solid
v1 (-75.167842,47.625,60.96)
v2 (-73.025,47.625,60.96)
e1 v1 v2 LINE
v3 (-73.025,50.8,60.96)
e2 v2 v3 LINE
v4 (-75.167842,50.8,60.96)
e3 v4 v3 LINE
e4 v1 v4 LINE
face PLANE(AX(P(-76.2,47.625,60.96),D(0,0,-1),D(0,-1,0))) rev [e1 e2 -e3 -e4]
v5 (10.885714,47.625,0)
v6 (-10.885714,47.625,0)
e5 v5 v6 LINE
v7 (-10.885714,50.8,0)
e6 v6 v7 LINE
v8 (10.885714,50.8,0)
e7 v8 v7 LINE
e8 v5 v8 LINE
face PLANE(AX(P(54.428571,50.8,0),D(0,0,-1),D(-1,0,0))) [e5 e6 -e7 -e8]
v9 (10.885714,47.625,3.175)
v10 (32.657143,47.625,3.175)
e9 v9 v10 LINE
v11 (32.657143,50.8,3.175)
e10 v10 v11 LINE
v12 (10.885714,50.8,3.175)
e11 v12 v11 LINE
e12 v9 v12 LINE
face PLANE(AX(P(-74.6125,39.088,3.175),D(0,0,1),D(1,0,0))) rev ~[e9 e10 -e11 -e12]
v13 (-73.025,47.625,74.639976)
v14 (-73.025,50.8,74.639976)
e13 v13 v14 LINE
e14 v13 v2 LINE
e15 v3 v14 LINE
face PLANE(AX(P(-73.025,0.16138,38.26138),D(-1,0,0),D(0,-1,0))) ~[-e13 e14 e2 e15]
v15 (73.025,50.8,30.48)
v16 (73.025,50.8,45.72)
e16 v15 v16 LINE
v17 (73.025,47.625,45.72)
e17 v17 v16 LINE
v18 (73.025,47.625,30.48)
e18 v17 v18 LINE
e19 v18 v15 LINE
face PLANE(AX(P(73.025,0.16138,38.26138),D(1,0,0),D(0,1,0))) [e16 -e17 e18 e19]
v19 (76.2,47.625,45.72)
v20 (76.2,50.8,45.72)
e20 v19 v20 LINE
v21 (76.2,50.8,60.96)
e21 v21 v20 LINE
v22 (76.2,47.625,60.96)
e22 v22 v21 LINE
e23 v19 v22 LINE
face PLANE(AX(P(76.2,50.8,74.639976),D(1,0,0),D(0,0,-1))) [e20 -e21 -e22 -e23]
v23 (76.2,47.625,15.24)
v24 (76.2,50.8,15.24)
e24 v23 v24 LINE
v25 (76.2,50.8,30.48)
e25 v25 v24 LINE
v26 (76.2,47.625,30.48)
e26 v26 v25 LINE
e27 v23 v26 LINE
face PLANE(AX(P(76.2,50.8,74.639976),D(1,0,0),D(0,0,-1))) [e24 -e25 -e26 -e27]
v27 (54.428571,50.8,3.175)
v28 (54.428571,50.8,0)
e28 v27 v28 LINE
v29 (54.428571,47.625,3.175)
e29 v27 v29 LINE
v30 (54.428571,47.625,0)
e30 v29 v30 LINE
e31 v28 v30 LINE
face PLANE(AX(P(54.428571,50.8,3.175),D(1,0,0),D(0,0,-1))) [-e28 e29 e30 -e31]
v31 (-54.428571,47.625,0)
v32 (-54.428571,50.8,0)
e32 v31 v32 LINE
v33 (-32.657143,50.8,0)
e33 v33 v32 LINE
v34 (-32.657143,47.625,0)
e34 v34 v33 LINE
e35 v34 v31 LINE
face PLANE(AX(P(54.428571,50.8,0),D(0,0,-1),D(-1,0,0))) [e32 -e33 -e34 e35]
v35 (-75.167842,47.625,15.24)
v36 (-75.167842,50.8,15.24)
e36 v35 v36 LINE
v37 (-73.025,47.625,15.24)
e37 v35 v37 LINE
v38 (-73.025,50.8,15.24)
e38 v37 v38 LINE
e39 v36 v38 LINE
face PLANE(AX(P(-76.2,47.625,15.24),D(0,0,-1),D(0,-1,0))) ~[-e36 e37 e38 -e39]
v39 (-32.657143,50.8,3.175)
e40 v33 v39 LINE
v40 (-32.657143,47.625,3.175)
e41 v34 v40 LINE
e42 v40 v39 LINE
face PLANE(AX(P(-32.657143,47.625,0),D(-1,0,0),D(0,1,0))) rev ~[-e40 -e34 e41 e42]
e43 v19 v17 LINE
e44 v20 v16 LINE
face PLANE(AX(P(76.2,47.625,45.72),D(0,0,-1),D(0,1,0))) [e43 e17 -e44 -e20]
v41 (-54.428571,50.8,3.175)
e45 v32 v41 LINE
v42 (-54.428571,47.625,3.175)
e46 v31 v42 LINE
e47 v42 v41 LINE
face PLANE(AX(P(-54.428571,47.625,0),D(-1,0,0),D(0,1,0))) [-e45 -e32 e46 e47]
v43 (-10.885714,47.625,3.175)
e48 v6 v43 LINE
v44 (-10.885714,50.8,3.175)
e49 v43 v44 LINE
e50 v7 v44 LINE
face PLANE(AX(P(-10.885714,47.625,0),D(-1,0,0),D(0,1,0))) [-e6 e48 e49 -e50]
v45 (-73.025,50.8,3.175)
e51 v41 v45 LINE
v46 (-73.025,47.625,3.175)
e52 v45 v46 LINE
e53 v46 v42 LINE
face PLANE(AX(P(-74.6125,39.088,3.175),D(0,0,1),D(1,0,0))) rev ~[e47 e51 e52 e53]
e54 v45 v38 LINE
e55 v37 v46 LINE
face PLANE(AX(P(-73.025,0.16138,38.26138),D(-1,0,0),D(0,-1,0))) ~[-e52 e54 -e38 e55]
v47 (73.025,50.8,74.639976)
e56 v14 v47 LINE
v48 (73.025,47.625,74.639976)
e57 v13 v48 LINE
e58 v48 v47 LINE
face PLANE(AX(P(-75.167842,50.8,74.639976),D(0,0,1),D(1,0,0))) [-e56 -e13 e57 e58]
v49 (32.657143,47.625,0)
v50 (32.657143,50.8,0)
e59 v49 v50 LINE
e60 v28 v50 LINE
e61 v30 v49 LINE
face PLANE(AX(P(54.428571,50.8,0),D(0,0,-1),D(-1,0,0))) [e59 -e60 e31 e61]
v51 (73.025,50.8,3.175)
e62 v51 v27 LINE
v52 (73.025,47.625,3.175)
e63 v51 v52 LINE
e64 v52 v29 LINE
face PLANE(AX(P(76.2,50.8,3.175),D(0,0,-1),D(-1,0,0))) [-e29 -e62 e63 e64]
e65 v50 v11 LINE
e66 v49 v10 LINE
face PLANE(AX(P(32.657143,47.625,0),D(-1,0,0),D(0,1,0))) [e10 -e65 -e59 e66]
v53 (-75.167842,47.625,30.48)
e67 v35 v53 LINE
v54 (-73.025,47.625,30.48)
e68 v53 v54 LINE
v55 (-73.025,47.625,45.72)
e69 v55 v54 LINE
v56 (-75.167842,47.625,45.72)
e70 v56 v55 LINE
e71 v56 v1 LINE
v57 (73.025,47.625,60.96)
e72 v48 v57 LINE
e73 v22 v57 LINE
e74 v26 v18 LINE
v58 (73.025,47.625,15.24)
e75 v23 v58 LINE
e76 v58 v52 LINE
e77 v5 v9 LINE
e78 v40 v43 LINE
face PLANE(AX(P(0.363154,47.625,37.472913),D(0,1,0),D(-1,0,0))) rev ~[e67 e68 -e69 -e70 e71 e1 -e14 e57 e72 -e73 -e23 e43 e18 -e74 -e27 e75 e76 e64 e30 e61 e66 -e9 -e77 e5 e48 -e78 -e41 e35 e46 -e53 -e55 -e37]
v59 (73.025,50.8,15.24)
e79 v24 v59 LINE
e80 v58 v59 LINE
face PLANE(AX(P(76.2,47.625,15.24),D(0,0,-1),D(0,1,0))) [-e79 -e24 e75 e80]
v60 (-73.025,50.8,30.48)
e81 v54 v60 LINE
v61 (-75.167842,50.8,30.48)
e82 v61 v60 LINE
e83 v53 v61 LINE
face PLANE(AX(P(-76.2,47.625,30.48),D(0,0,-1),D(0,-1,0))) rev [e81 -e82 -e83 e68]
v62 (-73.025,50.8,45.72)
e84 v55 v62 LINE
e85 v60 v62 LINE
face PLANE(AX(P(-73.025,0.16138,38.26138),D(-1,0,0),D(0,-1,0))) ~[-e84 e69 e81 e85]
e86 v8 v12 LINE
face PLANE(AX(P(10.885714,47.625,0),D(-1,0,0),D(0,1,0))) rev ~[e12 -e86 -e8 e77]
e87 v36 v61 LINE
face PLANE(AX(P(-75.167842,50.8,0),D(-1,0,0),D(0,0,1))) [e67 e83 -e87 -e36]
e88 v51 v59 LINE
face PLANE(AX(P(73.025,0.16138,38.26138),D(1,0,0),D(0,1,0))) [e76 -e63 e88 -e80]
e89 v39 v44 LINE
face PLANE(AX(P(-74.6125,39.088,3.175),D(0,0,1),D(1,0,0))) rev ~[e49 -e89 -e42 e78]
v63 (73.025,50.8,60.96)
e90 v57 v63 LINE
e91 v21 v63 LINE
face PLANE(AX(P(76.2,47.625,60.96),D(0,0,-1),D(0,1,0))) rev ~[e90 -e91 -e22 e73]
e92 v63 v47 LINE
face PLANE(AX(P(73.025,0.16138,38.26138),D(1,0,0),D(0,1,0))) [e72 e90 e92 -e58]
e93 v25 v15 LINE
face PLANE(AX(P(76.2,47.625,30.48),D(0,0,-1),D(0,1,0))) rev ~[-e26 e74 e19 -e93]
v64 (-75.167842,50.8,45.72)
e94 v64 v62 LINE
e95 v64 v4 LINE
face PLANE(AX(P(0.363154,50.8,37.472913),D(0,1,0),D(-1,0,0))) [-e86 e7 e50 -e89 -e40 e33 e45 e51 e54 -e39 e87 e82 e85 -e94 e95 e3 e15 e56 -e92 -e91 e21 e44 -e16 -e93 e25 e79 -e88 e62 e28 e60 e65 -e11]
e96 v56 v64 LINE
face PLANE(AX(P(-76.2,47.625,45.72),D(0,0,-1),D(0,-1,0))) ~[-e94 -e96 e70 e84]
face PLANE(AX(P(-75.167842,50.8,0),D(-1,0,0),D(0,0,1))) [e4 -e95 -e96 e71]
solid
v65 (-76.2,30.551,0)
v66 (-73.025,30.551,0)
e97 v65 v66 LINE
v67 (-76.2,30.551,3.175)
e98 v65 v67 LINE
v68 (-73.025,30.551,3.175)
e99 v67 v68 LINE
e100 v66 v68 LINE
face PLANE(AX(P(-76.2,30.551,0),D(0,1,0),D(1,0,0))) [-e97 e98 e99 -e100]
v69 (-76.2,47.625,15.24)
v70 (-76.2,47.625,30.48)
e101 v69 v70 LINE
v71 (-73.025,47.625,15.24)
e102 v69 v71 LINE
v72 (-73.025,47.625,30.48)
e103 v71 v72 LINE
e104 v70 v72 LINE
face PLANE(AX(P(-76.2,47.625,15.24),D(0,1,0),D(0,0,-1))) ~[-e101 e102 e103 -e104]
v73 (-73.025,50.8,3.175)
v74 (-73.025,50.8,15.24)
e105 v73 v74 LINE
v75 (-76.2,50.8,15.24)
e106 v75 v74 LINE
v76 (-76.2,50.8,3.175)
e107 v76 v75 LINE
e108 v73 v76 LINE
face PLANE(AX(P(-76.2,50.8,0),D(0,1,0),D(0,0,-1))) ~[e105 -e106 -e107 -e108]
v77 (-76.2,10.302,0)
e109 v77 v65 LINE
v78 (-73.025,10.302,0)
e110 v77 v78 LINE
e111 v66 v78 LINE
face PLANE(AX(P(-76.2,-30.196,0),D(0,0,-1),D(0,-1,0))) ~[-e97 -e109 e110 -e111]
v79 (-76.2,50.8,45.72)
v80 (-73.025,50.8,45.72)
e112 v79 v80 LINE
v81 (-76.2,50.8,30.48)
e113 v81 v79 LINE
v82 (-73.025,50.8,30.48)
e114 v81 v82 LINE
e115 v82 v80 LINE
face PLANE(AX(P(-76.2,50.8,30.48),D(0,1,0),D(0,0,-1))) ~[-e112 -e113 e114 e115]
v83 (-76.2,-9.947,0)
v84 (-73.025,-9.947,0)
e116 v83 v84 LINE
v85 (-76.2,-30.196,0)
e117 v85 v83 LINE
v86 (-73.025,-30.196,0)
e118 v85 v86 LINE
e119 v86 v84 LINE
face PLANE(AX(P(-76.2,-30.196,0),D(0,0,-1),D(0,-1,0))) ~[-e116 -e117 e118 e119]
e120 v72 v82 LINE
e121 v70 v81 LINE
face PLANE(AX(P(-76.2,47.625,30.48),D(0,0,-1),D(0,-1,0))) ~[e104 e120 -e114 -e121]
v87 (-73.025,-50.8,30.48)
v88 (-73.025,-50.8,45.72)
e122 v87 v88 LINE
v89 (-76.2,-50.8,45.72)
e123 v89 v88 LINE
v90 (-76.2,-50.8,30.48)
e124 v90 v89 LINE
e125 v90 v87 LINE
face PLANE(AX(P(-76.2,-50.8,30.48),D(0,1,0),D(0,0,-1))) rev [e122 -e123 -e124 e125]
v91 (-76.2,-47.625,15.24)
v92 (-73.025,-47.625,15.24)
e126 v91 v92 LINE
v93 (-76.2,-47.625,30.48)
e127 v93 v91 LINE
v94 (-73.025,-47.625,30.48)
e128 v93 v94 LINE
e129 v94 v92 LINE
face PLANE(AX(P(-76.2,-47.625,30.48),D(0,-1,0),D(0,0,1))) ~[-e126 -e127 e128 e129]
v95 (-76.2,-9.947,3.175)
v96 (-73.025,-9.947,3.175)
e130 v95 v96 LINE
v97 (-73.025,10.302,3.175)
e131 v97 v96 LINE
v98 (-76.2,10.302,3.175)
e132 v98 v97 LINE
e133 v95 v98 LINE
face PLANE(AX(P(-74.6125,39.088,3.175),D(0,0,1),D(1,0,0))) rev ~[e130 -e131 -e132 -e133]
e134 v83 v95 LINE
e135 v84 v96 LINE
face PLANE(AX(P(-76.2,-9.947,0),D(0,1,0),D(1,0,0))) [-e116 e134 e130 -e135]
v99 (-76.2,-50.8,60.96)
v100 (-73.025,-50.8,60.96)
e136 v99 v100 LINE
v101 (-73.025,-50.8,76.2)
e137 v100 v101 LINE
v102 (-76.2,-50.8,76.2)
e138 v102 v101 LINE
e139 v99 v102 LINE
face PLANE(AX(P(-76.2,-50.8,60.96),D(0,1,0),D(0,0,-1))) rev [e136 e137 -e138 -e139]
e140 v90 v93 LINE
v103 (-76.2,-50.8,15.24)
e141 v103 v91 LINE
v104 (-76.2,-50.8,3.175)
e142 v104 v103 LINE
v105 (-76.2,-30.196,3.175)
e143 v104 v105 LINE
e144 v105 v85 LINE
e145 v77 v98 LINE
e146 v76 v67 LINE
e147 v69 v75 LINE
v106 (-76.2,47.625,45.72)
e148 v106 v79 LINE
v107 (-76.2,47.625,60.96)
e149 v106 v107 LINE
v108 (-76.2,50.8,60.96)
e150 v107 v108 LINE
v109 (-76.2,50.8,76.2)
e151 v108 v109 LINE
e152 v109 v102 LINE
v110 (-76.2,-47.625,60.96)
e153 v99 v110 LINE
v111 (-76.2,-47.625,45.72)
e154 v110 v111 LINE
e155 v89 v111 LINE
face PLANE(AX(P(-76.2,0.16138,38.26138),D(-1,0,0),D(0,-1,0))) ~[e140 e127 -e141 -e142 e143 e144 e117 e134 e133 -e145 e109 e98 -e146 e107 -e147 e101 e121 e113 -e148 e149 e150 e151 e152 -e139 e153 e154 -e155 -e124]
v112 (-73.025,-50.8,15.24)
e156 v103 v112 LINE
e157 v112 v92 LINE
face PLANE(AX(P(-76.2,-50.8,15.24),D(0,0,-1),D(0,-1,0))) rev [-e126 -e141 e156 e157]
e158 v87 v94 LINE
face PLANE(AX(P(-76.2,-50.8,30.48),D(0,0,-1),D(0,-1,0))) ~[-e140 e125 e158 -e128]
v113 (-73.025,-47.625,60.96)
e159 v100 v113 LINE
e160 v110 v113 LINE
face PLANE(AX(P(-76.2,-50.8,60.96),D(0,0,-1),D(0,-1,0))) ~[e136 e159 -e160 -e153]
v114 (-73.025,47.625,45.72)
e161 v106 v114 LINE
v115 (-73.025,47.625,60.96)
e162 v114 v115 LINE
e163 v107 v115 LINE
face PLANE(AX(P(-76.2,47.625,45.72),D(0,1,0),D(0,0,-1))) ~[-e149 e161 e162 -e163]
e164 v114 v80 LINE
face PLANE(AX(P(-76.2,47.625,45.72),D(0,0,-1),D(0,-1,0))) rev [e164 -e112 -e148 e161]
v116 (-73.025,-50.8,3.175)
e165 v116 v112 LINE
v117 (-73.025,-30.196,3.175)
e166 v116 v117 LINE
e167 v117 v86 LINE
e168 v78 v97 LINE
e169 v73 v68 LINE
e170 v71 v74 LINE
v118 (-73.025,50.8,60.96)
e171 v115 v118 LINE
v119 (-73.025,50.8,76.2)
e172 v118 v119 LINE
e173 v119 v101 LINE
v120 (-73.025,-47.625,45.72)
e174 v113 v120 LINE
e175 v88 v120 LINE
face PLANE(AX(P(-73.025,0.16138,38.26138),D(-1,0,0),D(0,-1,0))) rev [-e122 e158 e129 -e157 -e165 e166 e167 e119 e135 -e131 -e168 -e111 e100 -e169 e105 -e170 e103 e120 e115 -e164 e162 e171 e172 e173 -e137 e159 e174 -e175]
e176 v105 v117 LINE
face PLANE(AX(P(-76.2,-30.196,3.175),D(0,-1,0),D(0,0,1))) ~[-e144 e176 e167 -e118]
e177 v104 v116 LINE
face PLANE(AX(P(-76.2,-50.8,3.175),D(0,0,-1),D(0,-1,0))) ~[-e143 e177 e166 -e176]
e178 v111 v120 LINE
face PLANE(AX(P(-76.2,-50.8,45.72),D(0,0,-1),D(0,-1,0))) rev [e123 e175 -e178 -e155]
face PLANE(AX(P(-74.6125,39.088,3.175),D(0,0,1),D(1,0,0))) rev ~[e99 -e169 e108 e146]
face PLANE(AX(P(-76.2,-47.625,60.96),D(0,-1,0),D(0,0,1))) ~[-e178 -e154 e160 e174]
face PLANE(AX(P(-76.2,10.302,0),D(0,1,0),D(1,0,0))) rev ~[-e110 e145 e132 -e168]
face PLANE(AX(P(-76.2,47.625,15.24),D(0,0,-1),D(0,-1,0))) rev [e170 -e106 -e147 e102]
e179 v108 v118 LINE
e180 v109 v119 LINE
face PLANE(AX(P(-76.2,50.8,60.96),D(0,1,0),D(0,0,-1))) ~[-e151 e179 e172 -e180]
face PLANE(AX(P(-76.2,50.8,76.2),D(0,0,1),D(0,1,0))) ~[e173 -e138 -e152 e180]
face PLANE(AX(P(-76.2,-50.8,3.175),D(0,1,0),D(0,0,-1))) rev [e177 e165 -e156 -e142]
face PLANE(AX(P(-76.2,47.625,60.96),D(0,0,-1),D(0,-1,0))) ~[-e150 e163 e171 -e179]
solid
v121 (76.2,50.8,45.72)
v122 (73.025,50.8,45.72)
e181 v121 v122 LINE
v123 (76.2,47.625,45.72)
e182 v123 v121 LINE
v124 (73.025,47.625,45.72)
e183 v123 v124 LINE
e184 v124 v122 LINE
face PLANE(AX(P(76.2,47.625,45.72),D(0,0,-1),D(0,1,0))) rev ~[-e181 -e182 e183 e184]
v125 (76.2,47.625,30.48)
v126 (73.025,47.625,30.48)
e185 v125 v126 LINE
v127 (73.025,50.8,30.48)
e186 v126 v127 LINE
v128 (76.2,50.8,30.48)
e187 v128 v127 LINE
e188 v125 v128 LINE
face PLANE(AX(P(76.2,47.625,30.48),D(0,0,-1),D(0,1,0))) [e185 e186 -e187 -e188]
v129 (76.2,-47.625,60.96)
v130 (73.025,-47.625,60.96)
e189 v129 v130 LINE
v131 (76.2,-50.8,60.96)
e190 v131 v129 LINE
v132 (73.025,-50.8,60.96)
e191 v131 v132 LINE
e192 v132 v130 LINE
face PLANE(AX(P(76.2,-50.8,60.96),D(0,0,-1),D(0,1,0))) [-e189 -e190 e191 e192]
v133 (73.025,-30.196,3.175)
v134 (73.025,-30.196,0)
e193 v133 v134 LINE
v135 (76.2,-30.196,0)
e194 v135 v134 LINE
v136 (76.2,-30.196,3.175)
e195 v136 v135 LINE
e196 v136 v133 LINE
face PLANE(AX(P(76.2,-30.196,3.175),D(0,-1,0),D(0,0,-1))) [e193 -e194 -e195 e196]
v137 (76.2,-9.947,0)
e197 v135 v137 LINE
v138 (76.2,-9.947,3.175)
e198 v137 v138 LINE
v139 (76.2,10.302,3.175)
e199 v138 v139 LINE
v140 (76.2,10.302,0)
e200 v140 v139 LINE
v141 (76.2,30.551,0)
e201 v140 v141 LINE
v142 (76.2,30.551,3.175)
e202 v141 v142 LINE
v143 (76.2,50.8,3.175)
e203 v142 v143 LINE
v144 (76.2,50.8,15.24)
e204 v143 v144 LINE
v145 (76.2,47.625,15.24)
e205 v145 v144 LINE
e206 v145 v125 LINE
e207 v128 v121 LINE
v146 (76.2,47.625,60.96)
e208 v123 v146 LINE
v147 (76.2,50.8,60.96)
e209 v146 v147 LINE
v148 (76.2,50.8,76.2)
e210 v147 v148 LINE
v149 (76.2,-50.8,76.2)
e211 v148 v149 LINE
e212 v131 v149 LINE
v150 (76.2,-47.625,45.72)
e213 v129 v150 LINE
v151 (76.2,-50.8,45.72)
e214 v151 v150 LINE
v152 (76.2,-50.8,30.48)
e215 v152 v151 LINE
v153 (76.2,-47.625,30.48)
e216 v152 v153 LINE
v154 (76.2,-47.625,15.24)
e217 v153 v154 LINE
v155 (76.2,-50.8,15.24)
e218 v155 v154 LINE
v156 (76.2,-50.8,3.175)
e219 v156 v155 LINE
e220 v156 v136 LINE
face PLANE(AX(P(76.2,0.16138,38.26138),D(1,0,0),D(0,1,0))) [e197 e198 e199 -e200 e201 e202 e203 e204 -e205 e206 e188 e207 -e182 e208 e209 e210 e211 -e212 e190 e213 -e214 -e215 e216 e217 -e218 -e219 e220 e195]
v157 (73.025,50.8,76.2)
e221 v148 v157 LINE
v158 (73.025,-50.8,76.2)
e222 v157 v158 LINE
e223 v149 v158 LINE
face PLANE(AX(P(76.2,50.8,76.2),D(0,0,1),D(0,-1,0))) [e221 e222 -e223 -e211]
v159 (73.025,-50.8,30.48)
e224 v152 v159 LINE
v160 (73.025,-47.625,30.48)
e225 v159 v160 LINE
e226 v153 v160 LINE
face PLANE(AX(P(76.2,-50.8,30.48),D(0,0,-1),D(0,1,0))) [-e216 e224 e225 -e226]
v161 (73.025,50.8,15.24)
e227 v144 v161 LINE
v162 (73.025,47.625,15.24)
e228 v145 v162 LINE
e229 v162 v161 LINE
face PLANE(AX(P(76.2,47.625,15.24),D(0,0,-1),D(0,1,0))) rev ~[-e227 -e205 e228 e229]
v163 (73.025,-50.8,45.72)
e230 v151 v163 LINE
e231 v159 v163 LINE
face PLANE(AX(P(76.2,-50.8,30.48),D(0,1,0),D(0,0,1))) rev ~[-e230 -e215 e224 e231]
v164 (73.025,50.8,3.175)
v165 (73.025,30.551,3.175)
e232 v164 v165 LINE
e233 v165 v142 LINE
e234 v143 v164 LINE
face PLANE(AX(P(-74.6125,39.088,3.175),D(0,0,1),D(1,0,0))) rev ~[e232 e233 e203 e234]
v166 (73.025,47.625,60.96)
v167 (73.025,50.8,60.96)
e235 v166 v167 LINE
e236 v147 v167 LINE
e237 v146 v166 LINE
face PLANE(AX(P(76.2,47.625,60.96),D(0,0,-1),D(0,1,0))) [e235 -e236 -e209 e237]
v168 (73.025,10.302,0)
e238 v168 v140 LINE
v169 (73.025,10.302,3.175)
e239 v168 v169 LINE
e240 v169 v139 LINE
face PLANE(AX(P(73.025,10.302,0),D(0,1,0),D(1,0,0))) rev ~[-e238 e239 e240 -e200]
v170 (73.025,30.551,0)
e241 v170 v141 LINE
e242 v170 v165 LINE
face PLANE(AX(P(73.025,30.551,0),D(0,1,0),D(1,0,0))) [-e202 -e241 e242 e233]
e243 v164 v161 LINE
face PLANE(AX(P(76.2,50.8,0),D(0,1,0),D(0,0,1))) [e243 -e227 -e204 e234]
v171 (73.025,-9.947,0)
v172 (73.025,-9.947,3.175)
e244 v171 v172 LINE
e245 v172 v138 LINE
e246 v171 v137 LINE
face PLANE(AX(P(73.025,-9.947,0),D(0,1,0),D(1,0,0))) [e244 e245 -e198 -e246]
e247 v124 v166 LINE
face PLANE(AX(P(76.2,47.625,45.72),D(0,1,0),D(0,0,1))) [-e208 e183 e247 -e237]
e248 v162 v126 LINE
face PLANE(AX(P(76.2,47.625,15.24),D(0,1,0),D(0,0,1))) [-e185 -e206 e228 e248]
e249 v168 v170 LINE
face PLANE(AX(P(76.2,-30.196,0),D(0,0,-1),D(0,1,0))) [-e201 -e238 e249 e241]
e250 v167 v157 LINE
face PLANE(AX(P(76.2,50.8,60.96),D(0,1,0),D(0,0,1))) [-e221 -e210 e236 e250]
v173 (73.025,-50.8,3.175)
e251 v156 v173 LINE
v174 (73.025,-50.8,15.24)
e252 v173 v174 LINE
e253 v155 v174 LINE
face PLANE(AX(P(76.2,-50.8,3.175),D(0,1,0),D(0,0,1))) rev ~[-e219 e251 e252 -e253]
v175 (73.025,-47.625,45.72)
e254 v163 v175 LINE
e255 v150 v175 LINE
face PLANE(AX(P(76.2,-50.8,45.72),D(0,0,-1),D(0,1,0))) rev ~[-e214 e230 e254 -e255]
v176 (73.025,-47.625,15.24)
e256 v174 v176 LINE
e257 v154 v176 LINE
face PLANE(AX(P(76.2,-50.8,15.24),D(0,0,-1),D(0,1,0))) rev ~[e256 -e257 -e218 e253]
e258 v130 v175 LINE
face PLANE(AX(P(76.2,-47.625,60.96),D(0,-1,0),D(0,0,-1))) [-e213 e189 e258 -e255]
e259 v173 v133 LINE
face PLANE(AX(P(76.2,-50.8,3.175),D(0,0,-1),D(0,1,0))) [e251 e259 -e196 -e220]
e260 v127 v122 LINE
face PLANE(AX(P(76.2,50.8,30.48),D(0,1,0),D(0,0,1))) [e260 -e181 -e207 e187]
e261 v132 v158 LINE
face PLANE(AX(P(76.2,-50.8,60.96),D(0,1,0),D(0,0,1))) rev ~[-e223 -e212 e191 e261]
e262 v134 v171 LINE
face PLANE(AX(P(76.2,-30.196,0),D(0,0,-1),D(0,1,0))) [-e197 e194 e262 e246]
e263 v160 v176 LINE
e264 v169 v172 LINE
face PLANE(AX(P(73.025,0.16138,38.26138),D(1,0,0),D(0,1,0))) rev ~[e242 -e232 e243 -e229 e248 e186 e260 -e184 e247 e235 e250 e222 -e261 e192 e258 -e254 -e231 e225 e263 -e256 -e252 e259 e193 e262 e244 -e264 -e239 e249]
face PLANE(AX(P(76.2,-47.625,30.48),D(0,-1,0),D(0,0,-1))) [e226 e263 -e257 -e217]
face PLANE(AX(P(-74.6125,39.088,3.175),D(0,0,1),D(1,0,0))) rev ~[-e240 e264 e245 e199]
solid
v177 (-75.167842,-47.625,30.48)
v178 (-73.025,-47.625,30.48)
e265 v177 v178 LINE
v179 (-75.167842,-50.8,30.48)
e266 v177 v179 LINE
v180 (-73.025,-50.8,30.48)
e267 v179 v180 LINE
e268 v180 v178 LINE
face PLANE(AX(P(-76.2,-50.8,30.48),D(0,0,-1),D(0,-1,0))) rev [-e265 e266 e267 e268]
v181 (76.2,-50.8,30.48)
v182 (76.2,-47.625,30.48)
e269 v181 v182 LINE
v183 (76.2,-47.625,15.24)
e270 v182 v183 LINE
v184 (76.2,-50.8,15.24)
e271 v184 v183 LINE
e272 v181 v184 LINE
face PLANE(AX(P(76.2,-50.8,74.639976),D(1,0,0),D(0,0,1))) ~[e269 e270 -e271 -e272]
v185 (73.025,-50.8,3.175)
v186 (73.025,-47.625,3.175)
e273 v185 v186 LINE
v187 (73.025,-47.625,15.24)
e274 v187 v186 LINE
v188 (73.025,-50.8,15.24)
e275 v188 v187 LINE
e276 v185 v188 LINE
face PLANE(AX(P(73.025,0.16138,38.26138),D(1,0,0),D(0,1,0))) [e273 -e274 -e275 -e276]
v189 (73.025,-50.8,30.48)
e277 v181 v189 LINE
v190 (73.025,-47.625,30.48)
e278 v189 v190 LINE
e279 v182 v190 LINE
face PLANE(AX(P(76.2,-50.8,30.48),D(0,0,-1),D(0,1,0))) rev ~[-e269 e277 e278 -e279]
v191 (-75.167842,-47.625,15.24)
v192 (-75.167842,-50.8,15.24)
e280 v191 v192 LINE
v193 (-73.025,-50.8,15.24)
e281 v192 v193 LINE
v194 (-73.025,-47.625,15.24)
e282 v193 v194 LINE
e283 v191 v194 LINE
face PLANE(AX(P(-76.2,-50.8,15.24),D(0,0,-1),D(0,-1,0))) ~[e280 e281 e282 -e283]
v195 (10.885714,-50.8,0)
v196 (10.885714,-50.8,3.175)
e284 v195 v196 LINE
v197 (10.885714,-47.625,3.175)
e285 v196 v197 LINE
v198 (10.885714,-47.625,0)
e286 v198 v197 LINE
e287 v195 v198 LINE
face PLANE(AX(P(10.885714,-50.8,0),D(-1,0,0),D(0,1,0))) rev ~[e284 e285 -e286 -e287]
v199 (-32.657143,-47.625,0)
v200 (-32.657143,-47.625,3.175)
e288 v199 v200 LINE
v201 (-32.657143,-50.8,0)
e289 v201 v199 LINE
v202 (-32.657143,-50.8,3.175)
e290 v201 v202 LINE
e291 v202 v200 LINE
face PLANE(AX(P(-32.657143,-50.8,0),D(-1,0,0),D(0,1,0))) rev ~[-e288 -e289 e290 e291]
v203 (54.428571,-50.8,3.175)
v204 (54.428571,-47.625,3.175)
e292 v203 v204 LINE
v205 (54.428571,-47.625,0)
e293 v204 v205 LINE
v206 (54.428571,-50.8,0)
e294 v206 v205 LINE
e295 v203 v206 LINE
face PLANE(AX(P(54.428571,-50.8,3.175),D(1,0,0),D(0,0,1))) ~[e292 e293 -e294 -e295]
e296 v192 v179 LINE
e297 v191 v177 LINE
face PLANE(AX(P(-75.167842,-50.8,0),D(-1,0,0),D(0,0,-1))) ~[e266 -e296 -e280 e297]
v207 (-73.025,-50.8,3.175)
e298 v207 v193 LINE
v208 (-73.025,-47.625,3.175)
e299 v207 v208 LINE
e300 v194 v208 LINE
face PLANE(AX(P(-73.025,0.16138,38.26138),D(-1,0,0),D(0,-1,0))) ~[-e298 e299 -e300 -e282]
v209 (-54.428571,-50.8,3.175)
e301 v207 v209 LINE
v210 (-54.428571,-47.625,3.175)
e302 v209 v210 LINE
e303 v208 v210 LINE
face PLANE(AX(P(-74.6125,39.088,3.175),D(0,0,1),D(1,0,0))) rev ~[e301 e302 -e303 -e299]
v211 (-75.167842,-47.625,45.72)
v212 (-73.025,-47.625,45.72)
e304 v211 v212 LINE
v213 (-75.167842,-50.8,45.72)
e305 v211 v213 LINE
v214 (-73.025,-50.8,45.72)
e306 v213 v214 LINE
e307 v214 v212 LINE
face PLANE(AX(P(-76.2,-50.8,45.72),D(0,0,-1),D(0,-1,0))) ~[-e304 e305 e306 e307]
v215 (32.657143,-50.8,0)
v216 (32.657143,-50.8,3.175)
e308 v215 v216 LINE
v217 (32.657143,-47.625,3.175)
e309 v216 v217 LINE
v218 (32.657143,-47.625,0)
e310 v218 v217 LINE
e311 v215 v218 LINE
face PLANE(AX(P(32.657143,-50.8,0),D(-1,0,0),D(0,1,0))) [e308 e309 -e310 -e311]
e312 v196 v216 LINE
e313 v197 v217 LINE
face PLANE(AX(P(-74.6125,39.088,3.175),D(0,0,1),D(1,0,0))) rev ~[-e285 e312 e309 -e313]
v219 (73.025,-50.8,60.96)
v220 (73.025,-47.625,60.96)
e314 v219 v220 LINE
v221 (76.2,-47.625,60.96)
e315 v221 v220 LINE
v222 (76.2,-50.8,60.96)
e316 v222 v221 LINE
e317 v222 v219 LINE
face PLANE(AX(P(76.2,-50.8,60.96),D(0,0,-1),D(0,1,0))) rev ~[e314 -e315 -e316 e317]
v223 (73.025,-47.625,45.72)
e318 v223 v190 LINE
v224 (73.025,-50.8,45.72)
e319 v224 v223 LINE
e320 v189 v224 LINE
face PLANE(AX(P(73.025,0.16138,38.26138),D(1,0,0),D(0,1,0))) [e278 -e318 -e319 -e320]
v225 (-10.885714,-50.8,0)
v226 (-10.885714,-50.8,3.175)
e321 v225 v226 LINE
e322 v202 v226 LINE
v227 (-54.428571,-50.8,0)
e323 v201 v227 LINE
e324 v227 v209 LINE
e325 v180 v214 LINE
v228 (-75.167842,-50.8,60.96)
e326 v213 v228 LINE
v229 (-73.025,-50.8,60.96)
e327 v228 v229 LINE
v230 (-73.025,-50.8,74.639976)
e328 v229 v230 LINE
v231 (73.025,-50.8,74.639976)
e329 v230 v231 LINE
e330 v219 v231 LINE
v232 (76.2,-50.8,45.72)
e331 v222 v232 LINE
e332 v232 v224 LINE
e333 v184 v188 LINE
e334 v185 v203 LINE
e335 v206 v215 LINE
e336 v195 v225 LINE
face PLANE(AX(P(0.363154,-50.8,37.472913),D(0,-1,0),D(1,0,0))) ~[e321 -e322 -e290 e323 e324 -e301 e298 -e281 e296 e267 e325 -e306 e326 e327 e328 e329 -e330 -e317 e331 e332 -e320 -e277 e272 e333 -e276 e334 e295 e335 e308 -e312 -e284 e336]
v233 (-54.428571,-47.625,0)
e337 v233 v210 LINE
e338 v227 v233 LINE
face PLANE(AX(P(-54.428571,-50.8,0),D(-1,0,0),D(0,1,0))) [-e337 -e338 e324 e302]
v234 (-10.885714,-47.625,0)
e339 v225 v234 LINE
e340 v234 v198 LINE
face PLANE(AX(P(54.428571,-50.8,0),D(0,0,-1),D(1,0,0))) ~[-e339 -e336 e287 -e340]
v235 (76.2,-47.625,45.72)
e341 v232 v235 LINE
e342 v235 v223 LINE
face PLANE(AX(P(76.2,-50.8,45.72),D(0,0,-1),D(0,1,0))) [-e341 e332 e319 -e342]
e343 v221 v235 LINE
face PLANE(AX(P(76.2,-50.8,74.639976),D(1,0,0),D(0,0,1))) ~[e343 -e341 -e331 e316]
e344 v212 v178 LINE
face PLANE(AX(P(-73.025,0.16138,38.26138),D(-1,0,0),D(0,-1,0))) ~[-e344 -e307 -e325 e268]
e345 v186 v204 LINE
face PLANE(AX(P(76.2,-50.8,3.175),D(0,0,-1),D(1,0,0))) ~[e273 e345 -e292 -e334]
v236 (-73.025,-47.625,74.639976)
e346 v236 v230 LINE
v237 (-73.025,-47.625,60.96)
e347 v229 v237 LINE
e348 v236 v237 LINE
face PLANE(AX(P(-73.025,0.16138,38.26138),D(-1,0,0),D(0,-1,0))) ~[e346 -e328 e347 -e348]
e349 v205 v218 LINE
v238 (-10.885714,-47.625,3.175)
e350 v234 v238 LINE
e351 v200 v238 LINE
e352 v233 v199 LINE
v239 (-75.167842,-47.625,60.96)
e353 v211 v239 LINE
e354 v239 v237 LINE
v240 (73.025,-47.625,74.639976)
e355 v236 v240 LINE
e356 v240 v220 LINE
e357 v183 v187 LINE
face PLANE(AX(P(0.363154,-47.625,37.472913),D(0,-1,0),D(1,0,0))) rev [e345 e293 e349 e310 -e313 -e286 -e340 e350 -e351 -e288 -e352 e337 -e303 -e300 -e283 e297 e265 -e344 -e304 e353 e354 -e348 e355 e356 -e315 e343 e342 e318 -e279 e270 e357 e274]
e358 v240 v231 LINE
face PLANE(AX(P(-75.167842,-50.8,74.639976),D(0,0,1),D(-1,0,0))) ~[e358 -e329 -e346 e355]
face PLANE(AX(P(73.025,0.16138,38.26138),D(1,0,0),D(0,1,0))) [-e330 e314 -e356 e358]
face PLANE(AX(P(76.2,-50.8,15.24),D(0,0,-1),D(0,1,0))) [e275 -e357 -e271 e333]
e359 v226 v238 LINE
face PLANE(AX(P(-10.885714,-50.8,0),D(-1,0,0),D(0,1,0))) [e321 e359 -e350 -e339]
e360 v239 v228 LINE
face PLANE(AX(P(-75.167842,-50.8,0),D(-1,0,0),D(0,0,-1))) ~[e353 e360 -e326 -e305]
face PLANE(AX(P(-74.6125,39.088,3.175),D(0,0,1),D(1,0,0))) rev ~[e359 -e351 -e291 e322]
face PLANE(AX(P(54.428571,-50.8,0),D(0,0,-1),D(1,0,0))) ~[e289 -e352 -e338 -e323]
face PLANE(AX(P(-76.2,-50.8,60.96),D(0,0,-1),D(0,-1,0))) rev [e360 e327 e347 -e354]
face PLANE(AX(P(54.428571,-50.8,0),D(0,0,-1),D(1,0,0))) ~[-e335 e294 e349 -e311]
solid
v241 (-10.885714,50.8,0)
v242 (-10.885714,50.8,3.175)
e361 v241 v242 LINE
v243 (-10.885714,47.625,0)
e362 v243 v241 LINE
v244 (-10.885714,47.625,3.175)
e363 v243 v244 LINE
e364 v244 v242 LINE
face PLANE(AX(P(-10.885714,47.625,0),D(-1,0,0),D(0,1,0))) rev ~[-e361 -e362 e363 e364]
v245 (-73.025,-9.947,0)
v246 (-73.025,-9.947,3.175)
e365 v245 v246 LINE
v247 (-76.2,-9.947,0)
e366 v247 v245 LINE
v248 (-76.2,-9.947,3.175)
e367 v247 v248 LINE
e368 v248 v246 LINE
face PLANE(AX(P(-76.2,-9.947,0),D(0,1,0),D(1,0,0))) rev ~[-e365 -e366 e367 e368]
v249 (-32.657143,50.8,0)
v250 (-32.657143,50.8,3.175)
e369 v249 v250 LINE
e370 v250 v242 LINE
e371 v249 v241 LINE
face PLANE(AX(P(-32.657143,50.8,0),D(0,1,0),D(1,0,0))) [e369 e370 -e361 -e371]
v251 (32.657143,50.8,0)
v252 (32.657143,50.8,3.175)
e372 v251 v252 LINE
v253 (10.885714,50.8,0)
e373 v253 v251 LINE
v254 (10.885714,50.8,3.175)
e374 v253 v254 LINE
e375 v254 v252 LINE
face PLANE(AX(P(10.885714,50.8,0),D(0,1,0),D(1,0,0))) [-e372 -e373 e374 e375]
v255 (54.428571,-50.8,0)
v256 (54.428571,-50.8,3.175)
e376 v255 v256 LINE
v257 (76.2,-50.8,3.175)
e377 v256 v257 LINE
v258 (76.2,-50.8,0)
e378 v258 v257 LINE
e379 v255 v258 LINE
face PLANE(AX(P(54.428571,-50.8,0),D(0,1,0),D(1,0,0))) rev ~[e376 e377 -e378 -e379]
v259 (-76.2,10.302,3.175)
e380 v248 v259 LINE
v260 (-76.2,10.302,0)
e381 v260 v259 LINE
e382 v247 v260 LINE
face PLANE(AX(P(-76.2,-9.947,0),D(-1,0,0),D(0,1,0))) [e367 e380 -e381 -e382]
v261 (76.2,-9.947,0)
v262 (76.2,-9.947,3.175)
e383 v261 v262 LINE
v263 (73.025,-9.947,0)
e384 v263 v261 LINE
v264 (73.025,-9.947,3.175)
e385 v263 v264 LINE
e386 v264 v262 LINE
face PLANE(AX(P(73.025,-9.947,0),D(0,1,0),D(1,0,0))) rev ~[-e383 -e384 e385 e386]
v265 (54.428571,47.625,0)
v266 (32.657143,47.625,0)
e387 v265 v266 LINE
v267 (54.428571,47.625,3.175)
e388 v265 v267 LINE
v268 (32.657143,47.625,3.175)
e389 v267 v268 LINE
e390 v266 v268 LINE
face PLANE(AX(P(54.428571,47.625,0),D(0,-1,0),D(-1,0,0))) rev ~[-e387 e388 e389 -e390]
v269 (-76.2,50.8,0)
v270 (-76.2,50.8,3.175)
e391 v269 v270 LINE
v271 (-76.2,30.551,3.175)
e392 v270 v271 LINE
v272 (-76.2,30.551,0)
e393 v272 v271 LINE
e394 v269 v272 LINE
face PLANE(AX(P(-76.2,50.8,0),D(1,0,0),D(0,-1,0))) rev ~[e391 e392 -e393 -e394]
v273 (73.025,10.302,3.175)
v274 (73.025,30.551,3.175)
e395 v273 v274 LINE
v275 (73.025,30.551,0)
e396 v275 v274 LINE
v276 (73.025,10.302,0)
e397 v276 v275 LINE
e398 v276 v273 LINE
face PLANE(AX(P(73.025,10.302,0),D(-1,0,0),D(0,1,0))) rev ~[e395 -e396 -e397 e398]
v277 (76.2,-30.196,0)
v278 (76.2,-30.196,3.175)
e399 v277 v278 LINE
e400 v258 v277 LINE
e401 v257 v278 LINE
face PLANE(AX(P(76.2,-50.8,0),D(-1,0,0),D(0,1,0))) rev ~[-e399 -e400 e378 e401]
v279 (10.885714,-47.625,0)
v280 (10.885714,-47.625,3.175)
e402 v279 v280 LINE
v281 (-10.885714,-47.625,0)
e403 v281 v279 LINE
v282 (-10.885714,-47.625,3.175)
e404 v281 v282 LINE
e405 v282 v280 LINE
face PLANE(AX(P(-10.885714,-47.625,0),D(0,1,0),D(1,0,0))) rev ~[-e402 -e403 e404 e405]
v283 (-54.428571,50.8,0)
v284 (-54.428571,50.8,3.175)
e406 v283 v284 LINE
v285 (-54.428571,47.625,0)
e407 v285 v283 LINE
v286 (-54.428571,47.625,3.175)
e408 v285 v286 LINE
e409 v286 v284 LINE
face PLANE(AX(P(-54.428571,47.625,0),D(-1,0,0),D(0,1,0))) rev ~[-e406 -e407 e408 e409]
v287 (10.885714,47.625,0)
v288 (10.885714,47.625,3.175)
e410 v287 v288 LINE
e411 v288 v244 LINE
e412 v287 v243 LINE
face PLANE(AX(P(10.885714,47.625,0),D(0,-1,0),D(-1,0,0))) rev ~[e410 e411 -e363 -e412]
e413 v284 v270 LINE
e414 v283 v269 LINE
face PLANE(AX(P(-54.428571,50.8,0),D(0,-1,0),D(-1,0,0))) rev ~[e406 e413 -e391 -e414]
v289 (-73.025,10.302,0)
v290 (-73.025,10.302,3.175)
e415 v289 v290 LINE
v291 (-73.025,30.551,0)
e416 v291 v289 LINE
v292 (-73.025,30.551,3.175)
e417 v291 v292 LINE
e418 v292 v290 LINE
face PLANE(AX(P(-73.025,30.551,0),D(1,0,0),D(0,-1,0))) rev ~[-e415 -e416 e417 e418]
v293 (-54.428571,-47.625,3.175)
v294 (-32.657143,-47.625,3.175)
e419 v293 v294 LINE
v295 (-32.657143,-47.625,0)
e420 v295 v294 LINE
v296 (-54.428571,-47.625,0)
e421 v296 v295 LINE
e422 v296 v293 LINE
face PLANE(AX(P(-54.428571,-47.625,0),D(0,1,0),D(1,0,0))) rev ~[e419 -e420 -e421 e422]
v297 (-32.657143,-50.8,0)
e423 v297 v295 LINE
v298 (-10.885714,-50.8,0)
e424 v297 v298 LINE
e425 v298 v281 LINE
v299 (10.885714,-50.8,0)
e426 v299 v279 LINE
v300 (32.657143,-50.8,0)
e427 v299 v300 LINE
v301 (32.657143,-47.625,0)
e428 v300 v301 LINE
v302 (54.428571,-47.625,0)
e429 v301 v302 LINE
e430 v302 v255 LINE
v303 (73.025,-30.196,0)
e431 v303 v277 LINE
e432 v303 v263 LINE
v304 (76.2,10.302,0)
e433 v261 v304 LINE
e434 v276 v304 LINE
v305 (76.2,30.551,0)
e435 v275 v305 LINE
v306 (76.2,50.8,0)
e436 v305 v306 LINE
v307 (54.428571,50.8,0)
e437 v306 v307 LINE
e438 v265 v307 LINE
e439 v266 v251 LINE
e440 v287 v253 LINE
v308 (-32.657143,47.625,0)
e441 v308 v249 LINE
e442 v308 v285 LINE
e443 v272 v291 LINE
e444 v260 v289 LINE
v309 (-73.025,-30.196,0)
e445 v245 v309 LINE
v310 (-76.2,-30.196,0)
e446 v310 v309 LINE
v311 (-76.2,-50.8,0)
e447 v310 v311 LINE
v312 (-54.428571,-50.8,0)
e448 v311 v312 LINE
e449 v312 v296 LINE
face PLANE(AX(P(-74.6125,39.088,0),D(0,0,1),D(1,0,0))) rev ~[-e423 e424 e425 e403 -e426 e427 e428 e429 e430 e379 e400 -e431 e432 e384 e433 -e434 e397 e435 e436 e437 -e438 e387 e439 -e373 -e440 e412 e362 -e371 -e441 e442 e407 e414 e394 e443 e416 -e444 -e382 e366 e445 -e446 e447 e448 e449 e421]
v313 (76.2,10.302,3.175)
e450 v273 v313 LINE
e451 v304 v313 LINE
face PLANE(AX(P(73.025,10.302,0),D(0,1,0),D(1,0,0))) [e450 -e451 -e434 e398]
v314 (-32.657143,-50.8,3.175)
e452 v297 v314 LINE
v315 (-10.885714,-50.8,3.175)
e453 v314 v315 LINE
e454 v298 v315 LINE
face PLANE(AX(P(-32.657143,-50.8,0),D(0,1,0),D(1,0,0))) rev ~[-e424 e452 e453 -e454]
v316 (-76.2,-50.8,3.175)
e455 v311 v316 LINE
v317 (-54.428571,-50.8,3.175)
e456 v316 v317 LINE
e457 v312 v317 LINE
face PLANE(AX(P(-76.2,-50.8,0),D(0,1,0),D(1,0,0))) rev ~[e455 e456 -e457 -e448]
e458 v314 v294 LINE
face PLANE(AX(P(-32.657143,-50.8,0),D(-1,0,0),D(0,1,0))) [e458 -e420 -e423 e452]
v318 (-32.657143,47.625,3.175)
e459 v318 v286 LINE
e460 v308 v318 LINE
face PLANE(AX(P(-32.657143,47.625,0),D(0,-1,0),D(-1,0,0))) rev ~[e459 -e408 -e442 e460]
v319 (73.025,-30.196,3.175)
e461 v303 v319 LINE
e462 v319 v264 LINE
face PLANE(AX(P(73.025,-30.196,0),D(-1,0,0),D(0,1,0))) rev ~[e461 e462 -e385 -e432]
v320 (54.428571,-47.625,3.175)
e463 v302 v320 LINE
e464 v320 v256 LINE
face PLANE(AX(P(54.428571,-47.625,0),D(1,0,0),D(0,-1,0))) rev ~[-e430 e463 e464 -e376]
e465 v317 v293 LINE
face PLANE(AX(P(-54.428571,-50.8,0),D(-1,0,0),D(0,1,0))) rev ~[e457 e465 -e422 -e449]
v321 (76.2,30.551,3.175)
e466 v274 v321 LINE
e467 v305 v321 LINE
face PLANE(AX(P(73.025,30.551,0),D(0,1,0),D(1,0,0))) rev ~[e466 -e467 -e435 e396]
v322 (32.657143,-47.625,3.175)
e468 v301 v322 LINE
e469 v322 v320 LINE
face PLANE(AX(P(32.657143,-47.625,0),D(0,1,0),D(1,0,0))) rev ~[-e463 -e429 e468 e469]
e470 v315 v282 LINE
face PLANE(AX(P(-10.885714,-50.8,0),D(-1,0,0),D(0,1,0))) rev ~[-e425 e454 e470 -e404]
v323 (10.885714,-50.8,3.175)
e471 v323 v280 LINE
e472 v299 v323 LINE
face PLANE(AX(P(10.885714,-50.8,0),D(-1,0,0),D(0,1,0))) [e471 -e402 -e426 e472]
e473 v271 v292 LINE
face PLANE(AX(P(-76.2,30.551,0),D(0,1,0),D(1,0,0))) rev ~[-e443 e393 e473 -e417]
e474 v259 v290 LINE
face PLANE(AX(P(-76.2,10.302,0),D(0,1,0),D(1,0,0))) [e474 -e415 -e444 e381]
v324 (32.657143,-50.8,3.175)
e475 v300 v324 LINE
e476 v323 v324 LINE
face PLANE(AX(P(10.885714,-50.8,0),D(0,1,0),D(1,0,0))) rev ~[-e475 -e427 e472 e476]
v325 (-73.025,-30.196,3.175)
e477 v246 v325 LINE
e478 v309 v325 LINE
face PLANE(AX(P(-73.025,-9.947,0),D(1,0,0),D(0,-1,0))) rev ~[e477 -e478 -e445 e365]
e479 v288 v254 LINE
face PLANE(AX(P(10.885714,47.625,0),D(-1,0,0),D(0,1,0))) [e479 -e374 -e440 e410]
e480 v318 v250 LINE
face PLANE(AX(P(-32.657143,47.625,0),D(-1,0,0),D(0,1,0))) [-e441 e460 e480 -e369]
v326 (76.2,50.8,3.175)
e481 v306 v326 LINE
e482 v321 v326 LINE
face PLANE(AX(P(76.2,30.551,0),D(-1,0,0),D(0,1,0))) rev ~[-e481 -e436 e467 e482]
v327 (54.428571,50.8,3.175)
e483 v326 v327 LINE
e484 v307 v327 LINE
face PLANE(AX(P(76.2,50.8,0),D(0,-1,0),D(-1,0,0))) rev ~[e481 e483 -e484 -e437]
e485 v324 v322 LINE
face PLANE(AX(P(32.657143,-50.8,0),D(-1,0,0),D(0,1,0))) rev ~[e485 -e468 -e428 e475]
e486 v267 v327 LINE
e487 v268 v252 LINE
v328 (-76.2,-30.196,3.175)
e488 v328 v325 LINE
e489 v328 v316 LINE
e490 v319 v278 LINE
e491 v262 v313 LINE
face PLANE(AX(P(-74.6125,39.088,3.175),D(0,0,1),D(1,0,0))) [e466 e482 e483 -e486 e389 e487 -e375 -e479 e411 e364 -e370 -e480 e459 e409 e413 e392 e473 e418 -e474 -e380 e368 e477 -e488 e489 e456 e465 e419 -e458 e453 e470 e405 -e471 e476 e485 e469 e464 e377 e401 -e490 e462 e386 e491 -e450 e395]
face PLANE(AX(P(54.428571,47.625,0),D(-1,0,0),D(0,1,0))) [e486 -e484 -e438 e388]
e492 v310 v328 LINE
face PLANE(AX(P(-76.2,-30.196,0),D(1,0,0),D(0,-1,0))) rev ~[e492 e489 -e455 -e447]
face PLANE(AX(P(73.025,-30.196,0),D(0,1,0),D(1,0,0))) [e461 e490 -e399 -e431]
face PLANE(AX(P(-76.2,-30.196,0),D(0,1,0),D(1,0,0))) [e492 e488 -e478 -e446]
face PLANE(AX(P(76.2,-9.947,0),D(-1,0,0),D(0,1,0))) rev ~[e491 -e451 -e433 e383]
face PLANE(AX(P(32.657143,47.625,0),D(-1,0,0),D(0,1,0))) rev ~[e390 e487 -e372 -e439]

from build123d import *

# Parameters (mm, degrees)
F0_W     = 3.175
F0_H     = 17.074
F0_W_2   = 18.5964285714
F0_H_2   = 3.175
F0_W_3   = 21.7714285714
F0_H_3   = 20.249
F0_H_4   = 17.429
F0_H_5   = 2.82
F1_DEPTH = 3.175
F2_W     = 3.175
F2_H     = 15.24
F2_H_2   = 12.065
F3_DEPTH = 3.175
F7_DEPTH = 3.175


with BuildPart() as f1:
    # F0 (on Top) → F1 (new body)
    with BuildSketch(Plane.XY):
        with Locations((-74.6125, 39.088)):
            Rectangle(F0_W, F0_H)
        with Locations((-63.7267857143, 49.2125)):
            Rectangle(F0_W_2, F0_H_2)
        with Locations((-74.6125, 49.2125)):
            Rectangle(F0_W, F0_H_2)
        with Locations((-21.7714285714, 49.2125)):
            Rectangle(F0_W_3, F0_H_2)
        Polygon((73.025, 30.551), (73.025, 47.625), (54.4285714286, 47.625), (32.6571428571, 47.625), (10.8857142857, 47.625), (-10.8857142857, 47.625), (-32.6571428571, 47.625), (-54.4285714286, 47.625), (-73.025, 47.625), (-73.025, 30.551), (-73.025, 10.302), (-73.025, -9.947), (-73.025, -30.196), (-73.025, -47.625), (-54.4285714286, -47.625), (-32.6571428571, -47.625), (-10.8857142857, -47.625), (10.8857142857, -47.625), (32.6571428571, -47.625), (54.4285714286, -47.625), (73.025, -47.625), (73.025, -30.196), (73.025, -9.947), (73.025, 10.302), align=None)
        with Locations((21.7714285714, 49.2125)):
            Rectangle(F0_W_3, F0_H_2)
        with Locations((63.7267857143, 49.2125)):
            Rectangle(F0_W_2, F0_H_2)
        with Locations((74.6125, 49.2125)):
            Rectangle(F0_W, F0_H_2)
        with Locations((74.6125, 39.088)):
            Rectangle(F0_W, F0_H)
        with Locations((74.6125, 0.1775)):
            Rectangle(F0_W, F0_H_3)
        with Locations((74.6125, -38.9105)):
            Rectangle(F0_W, F0_H_4)
        with Locations((74.6125, -49.035)):
            Rectangle(F0_W, F0_H_5)
        Polygon((73.025, -50.445), (73.025, -47.625), (54.4285714286, -47.625), (54.4285714286, -50.8), (73.025, -50.8), (76.2, -50.8), (76.2, -50.445), align=None)
        with Locations((21.7714285714, -49.2125)):
            Rectangle(F0_W_3, F0_H_2)
        with Locations((-21.7714285714, -49.2125)):
            Rectangle(F0_W_3, F0_H_2)
        Polygon((-54.4285714286, -50.8), (-54.4285714286, -47.625), (-73.025, -47.625), (-73.025, -50.445), (-76.2, -50.445), (-76.2, -50.8), (-73.025, -50.8), align=None)
        with Locations((-74.6125, -49.035)):
            Rectangle(F0_W, F0_H_5)
        with Locations((-74.6125, -38.9105)):
            Rectangle(F0_W, F0_H_4)
        with Locations((-74.6125, 0.1775)):
            Rectangle(F0_W, F0_H_3)
    extrude(amount=F1_DEPTH)


with BuildPart() as f3:
    # F2 (on face) → F3 (new body)
    with BuildSketch(Plane.YZ.offset(76.2)):
        Polygon((-30.196, 3.175), (-30.196, 0), (47.625, 0), (47.625, 15.24), (47.625, 30.48), (47.625, 45.72), (47.625, 60.96), (47.625, 76.2), (-47.625, 76.2), (-47.625, 60.96), (-47.625, 45.72), (-47.625, 30.48), (-47.625, 15.24), (-47.625, 3.175), align=None)
        with Locations((-49.2125, 68.58)):
            Rectangle(F2_W, F2_H)
        with Locations((-49.2125, 38.1)):
            Rectangle(F2_W, F2_H)
        with Locations((-49.2125, 9.2075)):
            Rectangle(F2_W, F2_H_2)
        with Locations((49.2125, 68.58)):
            Rectangle(F2_W, F2_H)
        with Locations((49.2125, 38.1)):
            Rectangle(F2_W, F2_H)
        with Locations((49.2125, 7.62)):
            Rectangle(F2_W, F2_H)
    extrude(amount=-F3_DEPTH)


with BuildPart() as f4_1:
    # F4: instance of F3
    add(f3.part.mirror(Plane.YZ))

    # F5: cut F1
    add(f1.part, mode=Mode.SUBTRACT)


with BuildPart() as f3_1:
    add(f3.part)

    # F5: cut F1
    add(f1.part, mode=Mode.SUBTRACT)


with BuildPart() as f7:
    # F6 (on face) → F7 (new body)
    with BuildSketch(Plane(origin=(0, 50.8, 0), x_dir=(-1, 0, 0), z_dir=(0, 1, 0))):
        Polygon((75.1678422093, 74.6399760246), (-76.2, 74.6399760246), (-76.2, 3.175), (-54.4285714286, 3.175), (-54.4285714286, 0), (75.1678422093, 0), align=None)
    extrude(amount=-F7_DEPTH)


with BuildPart() as f8_1:
    # F8: instance of F7
    add(f7.part.mirror(Plane.XZ))

    # F9: cut F3, F1, F4_1
    add(f3_1.part, mode=Mode.SUBTRACT)
    add(f1.part, mode=Mode.SUBTRACT)
    add(f4_1.part, mode=Mode.SUBTRACT)


with BuildPart() as f7_1:
    add(f7.part)

    # F9: cut F3, F1, F4_1
    add(f3_1.part, mode=Mode.SUBTRACT)
    add(f1.part, mode=Mode.SUBTRACT)
    add(f4_1.part, mode=Mode.SUBTRACT)


solid = Compound([f1.part, f4_1.part, f3_1.part, f8_1.part, f7_1.part])
